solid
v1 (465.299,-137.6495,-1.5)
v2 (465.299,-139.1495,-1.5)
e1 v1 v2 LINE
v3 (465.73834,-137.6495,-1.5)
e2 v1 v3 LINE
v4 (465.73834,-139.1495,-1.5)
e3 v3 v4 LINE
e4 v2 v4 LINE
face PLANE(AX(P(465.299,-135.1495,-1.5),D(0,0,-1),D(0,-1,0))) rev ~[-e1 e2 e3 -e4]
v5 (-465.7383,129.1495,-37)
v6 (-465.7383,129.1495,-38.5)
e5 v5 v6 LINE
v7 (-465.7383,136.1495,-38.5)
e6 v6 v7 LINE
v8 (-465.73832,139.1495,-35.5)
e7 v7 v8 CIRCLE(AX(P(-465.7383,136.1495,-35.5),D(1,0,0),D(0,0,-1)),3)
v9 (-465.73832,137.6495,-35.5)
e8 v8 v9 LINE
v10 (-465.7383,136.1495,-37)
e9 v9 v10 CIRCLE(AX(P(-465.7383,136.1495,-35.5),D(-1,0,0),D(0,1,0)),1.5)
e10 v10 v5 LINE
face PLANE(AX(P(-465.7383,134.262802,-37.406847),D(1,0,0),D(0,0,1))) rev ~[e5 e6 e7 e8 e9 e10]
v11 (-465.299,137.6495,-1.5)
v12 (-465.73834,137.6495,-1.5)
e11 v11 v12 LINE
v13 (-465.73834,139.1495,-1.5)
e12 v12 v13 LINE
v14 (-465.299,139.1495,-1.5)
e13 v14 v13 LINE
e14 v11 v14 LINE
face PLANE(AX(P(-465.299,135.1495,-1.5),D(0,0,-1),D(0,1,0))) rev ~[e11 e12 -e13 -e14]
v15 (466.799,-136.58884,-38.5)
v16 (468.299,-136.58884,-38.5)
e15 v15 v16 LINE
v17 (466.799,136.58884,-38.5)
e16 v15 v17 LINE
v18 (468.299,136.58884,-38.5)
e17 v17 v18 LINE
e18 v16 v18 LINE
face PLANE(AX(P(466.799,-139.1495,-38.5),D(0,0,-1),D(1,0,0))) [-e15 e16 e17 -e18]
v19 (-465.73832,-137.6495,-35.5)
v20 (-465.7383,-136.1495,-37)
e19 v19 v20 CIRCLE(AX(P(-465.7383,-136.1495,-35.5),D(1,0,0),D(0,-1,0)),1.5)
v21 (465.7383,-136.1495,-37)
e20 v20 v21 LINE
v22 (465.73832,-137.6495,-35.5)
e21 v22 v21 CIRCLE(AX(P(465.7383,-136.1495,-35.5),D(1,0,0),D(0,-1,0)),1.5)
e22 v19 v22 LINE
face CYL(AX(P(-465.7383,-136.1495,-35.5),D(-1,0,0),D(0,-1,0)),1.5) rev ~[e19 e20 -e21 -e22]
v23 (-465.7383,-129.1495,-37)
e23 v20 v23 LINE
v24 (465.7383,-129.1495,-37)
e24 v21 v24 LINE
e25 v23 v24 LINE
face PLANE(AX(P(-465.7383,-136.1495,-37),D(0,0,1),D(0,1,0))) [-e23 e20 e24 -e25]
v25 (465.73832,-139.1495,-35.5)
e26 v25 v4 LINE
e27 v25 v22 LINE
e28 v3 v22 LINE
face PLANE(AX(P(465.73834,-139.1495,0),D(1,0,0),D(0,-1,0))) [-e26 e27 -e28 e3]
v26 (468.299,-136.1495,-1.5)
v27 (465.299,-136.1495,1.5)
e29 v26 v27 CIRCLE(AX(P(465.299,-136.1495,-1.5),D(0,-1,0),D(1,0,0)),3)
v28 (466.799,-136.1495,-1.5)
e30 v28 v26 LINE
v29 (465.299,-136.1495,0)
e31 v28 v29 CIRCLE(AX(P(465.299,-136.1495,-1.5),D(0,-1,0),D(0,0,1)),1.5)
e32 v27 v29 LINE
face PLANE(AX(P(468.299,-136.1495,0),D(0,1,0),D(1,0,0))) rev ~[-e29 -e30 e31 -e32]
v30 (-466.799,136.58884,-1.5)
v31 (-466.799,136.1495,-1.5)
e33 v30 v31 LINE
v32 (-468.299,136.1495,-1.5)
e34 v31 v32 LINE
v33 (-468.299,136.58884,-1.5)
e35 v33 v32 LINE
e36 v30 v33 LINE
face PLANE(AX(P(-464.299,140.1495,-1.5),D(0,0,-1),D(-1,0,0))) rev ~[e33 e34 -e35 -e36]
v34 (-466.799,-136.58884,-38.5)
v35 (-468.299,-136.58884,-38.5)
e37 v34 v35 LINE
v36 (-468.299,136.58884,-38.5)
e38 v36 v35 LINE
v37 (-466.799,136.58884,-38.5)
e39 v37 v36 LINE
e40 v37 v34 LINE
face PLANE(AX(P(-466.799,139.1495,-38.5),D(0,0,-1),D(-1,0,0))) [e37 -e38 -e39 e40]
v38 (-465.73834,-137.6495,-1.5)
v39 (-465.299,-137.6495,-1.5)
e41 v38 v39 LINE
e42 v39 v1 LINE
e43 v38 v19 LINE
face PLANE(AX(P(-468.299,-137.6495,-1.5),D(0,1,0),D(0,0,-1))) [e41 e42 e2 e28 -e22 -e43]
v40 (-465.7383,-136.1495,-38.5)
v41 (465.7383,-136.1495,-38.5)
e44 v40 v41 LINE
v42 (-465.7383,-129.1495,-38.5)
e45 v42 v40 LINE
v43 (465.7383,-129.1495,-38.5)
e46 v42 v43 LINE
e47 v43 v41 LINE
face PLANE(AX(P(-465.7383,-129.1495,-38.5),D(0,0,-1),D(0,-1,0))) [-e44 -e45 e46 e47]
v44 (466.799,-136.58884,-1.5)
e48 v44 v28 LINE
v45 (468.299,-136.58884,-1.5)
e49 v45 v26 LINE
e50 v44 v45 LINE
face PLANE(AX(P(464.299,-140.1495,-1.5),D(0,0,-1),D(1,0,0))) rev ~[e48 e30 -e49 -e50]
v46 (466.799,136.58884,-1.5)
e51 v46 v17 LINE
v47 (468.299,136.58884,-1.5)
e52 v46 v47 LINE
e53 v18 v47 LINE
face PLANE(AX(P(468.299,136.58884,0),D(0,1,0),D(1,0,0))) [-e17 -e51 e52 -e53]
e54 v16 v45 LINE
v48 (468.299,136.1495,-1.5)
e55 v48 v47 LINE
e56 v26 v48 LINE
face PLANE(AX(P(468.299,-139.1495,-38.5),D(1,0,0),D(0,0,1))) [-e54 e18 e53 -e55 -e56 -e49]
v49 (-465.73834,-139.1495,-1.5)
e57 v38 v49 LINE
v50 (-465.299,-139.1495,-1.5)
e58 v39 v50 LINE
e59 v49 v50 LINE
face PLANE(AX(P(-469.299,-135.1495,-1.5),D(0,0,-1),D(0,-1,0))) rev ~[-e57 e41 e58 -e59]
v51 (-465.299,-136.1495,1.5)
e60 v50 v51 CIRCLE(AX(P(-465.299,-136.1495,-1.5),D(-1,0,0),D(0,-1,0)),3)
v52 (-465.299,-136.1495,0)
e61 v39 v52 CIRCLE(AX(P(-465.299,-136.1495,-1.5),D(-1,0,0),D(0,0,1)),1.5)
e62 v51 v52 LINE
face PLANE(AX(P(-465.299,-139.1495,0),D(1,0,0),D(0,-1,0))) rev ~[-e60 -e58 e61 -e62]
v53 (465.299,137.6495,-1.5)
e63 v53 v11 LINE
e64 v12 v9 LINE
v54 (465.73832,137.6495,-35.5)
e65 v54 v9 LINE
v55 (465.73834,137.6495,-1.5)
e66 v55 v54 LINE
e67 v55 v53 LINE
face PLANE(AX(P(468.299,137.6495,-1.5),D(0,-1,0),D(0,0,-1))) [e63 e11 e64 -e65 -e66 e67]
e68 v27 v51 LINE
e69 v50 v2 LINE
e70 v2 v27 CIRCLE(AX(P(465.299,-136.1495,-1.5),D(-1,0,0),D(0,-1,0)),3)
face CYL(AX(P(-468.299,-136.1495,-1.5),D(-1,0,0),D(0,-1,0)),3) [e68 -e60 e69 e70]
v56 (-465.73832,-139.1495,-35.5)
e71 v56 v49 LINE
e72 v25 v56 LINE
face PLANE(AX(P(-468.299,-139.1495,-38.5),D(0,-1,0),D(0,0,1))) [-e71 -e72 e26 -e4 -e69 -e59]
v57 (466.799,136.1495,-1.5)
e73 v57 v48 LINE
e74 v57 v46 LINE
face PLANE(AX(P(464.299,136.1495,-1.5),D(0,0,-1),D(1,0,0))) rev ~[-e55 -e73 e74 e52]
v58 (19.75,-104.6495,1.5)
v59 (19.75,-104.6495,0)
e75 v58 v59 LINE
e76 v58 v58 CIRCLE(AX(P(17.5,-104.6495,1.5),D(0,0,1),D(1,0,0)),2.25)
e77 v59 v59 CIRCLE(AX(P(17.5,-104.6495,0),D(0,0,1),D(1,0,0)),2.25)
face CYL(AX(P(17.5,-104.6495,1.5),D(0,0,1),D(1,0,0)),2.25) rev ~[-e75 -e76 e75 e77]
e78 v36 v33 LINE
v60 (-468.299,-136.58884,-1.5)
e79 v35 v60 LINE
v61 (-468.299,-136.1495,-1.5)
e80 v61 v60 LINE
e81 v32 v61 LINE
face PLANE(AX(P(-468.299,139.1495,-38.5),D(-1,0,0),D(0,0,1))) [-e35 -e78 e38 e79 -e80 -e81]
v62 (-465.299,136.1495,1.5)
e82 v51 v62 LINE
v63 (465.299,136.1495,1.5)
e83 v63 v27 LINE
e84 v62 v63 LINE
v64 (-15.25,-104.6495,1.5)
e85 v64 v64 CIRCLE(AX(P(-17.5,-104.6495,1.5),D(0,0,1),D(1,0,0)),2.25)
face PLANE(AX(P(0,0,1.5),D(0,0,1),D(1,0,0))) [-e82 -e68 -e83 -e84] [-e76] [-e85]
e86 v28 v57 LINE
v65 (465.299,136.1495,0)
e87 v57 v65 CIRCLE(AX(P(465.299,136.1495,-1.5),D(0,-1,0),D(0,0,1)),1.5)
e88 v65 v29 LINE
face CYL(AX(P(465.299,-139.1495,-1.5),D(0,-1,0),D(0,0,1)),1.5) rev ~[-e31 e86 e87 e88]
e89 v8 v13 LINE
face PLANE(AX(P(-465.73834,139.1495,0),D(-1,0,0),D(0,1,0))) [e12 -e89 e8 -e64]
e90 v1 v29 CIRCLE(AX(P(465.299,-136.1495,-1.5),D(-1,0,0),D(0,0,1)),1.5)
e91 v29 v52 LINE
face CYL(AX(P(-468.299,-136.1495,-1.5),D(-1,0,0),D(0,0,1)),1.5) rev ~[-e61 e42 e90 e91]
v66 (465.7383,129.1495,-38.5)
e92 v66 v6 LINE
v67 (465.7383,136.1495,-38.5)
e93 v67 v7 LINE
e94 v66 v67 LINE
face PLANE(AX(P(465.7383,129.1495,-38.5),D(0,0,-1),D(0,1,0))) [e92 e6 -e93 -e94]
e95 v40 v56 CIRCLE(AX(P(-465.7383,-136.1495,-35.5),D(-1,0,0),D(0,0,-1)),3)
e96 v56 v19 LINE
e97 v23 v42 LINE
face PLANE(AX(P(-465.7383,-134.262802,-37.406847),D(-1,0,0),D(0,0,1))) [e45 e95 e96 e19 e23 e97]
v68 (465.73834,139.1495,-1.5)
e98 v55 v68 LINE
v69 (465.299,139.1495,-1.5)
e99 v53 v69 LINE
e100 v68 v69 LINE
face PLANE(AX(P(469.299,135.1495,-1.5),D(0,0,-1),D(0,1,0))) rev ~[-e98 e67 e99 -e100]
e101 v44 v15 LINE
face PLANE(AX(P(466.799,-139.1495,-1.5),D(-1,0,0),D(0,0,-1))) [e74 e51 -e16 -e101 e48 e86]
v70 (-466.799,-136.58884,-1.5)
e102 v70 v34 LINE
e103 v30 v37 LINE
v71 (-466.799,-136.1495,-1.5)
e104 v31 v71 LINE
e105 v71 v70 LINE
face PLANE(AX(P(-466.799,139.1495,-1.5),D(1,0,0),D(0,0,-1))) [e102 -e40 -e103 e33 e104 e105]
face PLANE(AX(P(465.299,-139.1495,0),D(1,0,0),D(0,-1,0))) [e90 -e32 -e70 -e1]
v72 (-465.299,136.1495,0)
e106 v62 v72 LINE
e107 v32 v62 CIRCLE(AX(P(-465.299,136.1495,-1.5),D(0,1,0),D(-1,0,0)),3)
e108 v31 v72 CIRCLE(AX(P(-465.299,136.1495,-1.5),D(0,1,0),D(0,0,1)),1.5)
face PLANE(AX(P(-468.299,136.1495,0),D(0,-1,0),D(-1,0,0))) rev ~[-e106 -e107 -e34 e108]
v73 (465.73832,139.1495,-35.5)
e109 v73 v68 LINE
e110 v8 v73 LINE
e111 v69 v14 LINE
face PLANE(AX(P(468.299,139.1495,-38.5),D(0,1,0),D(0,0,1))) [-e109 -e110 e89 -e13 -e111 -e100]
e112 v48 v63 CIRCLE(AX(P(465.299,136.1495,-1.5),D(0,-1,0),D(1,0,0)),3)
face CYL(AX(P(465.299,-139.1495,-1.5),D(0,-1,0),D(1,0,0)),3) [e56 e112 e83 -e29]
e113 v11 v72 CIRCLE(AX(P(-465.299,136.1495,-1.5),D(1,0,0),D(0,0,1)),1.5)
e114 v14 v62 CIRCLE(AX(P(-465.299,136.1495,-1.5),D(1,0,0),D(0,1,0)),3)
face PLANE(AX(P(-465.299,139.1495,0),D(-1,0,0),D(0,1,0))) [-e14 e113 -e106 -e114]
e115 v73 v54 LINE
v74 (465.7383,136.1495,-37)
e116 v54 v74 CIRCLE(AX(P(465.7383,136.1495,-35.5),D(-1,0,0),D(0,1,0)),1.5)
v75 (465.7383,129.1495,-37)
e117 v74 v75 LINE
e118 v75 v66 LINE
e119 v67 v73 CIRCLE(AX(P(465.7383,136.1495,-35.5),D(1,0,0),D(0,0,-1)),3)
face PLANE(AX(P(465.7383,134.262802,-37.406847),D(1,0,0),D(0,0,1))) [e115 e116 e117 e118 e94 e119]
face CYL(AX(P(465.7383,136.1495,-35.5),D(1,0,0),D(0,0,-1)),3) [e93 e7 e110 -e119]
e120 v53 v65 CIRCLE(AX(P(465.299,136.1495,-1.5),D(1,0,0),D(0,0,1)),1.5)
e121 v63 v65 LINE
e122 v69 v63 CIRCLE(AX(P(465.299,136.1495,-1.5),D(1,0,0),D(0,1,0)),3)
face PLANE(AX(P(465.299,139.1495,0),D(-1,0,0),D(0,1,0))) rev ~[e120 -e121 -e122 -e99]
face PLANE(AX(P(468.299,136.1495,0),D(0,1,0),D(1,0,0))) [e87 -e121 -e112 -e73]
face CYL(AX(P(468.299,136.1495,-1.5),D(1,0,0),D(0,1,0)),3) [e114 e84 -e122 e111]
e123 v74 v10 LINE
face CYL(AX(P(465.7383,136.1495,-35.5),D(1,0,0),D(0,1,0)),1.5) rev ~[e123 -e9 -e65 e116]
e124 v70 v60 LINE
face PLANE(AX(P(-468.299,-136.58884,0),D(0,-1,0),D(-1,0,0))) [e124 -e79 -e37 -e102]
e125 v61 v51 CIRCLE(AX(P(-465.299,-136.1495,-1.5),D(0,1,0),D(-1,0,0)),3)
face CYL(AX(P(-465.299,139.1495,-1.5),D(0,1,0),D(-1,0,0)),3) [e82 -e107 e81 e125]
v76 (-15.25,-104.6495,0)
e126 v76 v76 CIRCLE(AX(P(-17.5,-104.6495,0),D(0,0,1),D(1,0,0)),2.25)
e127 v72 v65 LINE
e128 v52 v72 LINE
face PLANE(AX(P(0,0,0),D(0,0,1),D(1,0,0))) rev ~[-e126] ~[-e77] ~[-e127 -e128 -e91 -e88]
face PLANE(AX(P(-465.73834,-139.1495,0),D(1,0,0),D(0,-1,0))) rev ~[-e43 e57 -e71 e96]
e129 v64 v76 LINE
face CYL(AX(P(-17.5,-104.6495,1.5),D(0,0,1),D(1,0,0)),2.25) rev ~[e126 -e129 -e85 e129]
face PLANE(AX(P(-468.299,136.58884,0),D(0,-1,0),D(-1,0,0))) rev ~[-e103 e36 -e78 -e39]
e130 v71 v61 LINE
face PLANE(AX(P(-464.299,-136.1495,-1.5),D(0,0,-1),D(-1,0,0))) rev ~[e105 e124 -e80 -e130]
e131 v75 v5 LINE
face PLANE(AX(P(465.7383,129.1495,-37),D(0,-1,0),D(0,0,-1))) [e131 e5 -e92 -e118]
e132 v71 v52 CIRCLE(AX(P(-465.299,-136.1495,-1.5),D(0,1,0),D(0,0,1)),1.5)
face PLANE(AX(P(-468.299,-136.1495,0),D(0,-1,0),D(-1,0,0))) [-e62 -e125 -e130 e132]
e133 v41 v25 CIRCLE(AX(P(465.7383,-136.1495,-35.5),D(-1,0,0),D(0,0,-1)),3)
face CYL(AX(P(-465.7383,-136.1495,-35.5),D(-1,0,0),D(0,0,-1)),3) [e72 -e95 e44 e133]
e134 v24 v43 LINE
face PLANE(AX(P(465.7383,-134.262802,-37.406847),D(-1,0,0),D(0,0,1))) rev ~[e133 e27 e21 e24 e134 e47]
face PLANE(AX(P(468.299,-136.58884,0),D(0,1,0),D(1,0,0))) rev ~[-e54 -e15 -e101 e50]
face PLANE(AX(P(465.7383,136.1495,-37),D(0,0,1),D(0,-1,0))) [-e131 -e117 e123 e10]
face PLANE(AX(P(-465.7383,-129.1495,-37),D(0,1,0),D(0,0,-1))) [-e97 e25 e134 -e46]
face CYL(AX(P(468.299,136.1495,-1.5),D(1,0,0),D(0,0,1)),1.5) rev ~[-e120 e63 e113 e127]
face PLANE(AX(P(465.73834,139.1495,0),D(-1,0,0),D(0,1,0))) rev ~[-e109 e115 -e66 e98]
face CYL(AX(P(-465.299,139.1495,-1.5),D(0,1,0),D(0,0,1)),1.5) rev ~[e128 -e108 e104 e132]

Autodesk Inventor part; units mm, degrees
ref_plane "YZ Plane" through (0, 0, 0) normal (1, 0, 0) x (0, 1, 0)
ref_plane "XZ Plane" through (0, 0, 0) normal (0, 1, 0) x (-1, 0, 0)
ref_plane "XY Plane" through (0, 0, 0) normal (0, 0, 1) x (1, 0, 0)
sketch "Sketch1" plane through (0, 0, 0) normal (0, 0, 1) x (1, 0, 0)
  line L0 (468.299, -139.1495) -> (-468.299, -139.1495)
  line L1 (-468.299, -139.1495) -> (-468.299, 139.1495)
  line L2 (-468.299, 139.1495) -> (468.299, 139.1495)
  line L3 (468.299, 139.1495) -> (468.299, -139.1495)
  line L4 (468.299, -139.1495) -> (-468.299, 139.1495) construction
  line L5 (-468.299, -139.1495) -> (468.299, 139.1495) construction
  point P0 (0, 0)
  dimension "d0" = 936.598
  dimension "d1" = 278.299
extrude "Plate1" add sketch "Sketch1" along normal blind 1.5
sketch "Sketch2" plane through (-468.299, -137.6495, 1.5) normal (0, -1, 0) x (1, 0, 0)
  line L0 (936.598, 0) -> (0, 0)
  line L1 (0, 0) -> (0, -40)
  line L2 (0, -40) -> (936.598, -40)
  line L3 (936.598, -40) -> (936.598, 0)
edge flange "Flange1" height 40 angle 90 thickness 1.5 bend radius 1.5 thickness toward (0, -1, 0) relief tear relief width 1.5 relief depth 0.75 corner gap 1.5 corner form 2 edges at (0, -139.1495, 0) (-468.299, 0, 0) (0, 139.1495, 0) (468.299, 0, 0) wall of the first edge with corners at (468.299, -137.6495, 1.5) (-468.299, -137.6495, 1.5) (-468.299, -137.6495, -38.5) (468.299, -137.6495, -38.5)
bend "Bend1"
corner "Corner1"
sketch "Sketch3" plane through (-465.7383, -139.1495, -37) normal (0, 0, -1) x (-1, 0, 0)
  line L0 (-931.4767, 0) -> (0, 0)
  line L1 (0, 0) -> (0, 10)
  line L2 (0, 10) -> (-931.4767, 10)
  line L3 (-931.4767, 10) -> (-931.4767, 0)
edge flange "Flange2" height 10 angle 90 thickness 1.5 bend radius 1.5 thickness toward (0, 0, -1) relief tear relief width 1.5 relief depth 0.75 corner gap 1.5 corner form 0 edges at (0, -137.6495, -38.5) (0, 137.6495, -38.5) wall of the first edge with corners at (465.7383, -139.1495, -37) (-465.7383, -139.1495, -37) (-465.7383, -129.1495, -37) (465.7383, -129.1495, -37)
bend "Bend2"
corner "Corner2"
sketch "Sketch4" plane through (0, 0, 1.5) normal (0, 0, 1) x (1, 0, 0)
  circle A0 centre (17.5, -104.6495) radius 2.25 projected
  circle A1 centre (-17.5, -104.6495) radius 2.25 projected
  point P0 (0, 0)
extrude "Extrusion1" cut sketch "Sketch4" against normal through all
equation "\"d3\" = BendReliefWidth"
equation "\"d4\" = BendReliefDepth"
equation "\"d5\" = MinimumRemnant"
equation "\"d6\" = BendRadius"
equation "\"d9\" = BendRadius"
equation "\"d10\" = CornerReliefSize"
equation "\"d11\" = GapSize"
equation "\"d12\" = JacobiRadiusSize"
equation "\"d13\" = BendReliefWidth"
equation "\"d14\" = BendReliefDepth"
equation "\"d15\" = MinimumRemnant"
equation "\"d16\" = BendRadius"
equation "\"d19\" = BendRadius"
equation "\"d20\" = CornerReliefSize"
equation "\"d21\" = GapSize"
equation "\"d22\" = JacobiRadiusSize"
equation "\"BendRadius\" = Thickness"
equation "\"BendReliefWidth\" = Thickness"
equation "\"BendReliefDepth\" = 0.5 * Thickness"
equation "\"CornerReliefSize\" = 4 * Thickness"
equation "\"MinimumRemnant\" = 2 * Thickness"
equation "\"TransitionRadius\" = BendRadius"
equation "\"JacobiRadiusSize\" = BendRadius"
equation "\"GapSize\" = Thickness"
equation "\"d2\" = BendRadius"
equation "\"Thickness\" = 1.5"
properties part number "Base Gabinete" material "Stainless Steel"
